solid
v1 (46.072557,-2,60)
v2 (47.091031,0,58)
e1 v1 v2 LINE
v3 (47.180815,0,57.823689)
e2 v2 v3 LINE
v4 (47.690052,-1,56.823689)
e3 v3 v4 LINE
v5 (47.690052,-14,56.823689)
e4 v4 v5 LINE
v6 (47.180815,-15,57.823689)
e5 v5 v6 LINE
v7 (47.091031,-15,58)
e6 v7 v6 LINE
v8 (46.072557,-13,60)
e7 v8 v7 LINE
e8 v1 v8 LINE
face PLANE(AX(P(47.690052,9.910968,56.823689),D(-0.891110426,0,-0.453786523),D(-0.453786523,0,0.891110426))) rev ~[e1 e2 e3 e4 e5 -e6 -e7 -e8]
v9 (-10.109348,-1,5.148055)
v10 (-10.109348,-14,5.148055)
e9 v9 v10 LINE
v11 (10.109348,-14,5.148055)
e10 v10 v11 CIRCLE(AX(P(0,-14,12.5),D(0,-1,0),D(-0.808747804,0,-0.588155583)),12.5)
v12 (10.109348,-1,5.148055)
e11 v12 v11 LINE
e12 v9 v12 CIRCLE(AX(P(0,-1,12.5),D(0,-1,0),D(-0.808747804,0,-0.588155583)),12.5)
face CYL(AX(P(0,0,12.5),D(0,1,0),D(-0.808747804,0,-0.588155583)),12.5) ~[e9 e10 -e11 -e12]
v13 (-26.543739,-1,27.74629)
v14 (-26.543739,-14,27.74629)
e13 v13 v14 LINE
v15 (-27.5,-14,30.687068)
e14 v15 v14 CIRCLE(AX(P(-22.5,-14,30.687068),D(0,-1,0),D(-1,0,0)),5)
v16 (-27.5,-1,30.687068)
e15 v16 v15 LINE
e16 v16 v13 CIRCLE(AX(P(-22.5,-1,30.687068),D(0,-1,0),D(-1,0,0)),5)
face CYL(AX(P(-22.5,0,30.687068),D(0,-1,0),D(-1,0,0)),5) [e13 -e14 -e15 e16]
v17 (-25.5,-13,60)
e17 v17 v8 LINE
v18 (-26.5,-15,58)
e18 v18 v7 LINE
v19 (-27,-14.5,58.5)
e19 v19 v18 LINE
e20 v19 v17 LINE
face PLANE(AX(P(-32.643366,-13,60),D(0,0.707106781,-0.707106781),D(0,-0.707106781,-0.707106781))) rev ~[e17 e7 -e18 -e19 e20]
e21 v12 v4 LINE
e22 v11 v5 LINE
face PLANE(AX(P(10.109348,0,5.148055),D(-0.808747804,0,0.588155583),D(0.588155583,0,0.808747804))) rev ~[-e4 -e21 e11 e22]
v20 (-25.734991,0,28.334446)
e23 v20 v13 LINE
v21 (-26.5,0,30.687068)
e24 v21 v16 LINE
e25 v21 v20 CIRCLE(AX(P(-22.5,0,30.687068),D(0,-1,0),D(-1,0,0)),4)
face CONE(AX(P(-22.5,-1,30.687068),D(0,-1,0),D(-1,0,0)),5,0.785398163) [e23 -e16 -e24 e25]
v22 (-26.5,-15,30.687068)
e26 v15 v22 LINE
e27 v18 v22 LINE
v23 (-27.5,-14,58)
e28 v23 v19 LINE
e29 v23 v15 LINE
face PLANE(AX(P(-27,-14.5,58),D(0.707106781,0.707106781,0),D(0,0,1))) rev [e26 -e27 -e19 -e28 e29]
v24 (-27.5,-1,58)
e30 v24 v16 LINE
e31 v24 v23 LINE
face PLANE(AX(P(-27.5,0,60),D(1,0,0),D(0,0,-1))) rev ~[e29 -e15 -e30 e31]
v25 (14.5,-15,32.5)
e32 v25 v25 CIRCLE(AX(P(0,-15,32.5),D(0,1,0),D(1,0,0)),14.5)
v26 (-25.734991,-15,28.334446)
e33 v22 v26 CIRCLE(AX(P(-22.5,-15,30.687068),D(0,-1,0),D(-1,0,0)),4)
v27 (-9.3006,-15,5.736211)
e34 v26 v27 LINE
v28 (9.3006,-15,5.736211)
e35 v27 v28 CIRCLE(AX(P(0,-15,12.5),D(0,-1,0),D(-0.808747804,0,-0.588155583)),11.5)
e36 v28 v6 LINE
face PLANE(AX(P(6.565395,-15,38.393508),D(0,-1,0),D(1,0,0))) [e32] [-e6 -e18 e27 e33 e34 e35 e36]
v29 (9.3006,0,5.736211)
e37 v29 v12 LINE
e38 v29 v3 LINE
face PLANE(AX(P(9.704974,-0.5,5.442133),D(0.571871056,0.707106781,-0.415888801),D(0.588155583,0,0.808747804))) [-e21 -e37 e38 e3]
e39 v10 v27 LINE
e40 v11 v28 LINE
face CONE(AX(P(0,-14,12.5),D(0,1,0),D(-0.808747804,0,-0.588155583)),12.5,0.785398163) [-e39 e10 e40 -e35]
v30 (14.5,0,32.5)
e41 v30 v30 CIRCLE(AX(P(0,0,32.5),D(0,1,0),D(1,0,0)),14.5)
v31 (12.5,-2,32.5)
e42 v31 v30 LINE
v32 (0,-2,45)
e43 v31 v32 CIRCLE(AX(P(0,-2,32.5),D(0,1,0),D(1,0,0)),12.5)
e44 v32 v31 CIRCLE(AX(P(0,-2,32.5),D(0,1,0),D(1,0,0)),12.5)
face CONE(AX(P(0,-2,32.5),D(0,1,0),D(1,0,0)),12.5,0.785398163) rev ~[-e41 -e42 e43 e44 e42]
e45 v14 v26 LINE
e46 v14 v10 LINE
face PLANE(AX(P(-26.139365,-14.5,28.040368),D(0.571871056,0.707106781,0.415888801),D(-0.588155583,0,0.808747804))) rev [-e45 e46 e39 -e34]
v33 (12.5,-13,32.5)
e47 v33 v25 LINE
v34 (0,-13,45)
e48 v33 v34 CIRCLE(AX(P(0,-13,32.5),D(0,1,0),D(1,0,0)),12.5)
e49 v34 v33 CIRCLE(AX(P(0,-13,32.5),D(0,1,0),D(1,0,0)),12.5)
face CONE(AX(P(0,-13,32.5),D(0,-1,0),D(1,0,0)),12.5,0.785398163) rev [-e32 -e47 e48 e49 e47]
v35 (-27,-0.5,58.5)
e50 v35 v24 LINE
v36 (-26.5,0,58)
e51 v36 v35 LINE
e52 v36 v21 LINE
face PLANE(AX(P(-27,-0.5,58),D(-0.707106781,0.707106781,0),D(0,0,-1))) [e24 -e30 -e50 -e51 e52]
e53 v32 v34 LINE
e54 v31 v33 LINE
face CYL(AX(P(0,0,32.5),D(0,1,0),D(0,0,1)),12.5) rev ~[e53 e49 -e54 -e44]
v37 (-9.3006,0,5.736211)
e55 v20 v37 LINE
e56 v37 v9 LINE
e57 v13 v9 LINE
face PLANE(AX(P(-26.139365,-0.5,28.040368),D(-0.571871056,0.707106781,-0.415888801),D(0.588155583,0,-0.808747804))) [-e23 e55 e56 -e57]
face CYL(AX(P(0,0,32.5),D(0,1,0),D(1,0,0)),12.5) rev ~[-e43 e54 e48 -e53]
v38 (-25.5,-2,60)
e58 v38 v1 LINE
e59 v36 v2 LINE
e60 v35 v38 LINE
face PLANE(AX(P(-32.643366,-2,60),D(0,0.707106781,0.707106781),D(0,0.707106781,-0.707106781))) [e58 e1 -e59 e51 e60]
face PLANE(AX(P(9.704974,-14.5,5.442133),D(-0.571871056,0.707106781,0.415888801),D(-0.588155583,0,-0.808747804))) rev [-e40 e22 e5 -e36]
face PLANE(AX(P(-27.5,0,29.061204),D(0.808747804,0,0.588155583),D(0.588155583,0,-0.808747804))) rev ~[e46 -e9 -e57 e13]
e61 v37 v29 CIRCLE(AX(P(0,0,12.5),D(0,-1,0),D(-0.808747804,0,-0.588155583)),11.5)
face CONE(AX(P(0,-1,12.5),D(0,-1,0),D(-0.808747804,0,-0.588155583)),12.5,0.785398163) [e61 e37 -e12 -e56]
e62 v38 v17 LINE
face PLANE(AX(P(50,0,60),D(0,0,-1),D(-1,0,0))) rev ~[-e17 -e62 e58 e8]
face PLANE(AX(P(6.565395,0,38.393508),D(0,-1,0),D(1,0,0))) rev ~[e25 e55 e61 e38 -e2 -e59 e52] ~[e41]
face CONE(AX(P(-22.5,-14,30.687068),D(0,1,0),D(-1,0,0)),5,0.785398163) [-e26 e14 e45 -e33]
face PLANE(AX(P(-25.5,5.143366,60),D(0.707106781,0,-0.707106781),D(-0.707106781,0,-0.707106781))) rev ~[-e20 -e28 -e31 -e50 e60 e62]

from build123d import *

# Parameters (mm, degrees)
F1_DEPTH    = 15
F2_T1_DEPTH = 34.8219363514
F2_T3_DEPTH = 25.2867319519
F2_T5_DEPTH = 87.7867319519
F3_R        = 5
F4_SIZE     = 1


# Not quite as in the source:
# - a fillet or chamfer that OpenCascade refuses, or shapes differently, is made with other operations: its cross-section is extruded or revolved along the edge and cut away or added


with BuildPart() as f1:
    # F0 (on Front) → F1 (new body)
    with BuildSketch(Plane.XZ):
        with BuildLine():
            Line((50, 60), (0, 60))
            Line((0, 60), (-27.5, 60))
            Line((-27.5, 60), (-27.5, 29.0612040202))
            Line((-27.5, 29.0612040202), (-10.1093475479, 5.1480552127))
            ThreePointArc((-10.1093475479, 5.1480552127), (0, 0), (10.1093475479, 5.1480552127))
            Line((10.1093475479, 5.1480552127), (50, 60))
        make_face()
        with BuildLine():
            ThreePointArc((12.5, 32.5), (-8.8388347648, 23.6611652352), (0, 45))
            ThreePointArc((0, 45), (8.8388347648, 41.3388347648), (12.5, 32.5))
        make_face(mode=Mode.SUBTRACT)
    extrude(amount=F1_DEPTH)

    # F2: chamfer of 2 on 7 edges, made by hand

    # F2_s2 → F2_t1 (cut)
    with BuildSketch(Plane.XZ.offset(-9.9109681757)):
        Polygon((47.69005228, 56.823688834), (46.0725566723, 60), (50, 60), align=None)
    extrude(amount=F2_T1_DEPTH, mode=Mode.SUBTRACT)

    # F2_s4 → F2_t3 (cut)
    with BuildSketch(Plane.XZ.offset(-5.1433659759)):
        Polygon((-25.5, 60), (-27.5, 58), (-27.5, 60), align=None)
    extrude(amount=F2_T3_DEPTH, mode=Mode.SUBTRACT)

    # F2_s6 → F2_t5 (cut)
    with BuildSketch(Plane.YZ.offset(-32.6433659759)):
        Polygon((-2, 60), (0, 58), (0, 60), align=None)
        Polygon((-13, 60), (-15, 58), (-15, 60), align=None)
    extrude(amount=F2_T5_DEPTH, mode=Mode.SUBTRACT)

    # F2_s7 → F2_t8 (revolve, cut)
    with BuildSketch(Plane.XY.offset(32.5)):
        Polygon((12.5, -2), (14.5, 0), (12.5, 0), align=None)
    revolve(axis=Axis((0, 0, 32.5), (0, 1, 0)), mode=Mode.SUBTRACT)

    # F2_s9 → F2_t10 (revolve, cut)
    with BuildSketch(Plane.XY.offset(32.5)):
        Polygon((12.5, -13), (14.5, -15), (12.5, -15), align=None)
    revolve(axis=Axis((0, -15, 32.5), (0, 1, 0)), mode=Mode.SUBTRACT)

    # F3
    f3_edges = [f1.edges().sort_by_distance(p)[0] for p in [
        (-27.5, -7.5, 29.061204),
    ]]
    fillet(f3_edges, radius=F3_R)

    # F4
    f4_edges = [f1.edges().sort_by_distance(p)[0] for p in [
        (28.8997, -15, 30.985872),
        (28.8997, 0, 30.985872),
        (-27.5, 0, 44.343534),
        (-27.254929, 0, 29.140895),
        (-18.326543, 0, 16.447173),
        (0, 0, 0),
        (-27.5, -15, 44.343534),
        (-27.254929, -15, 29.140895),
        (-18.326543, -15, 16.447173),
        (0, -15, 0),
    ]]
    chamfer(f4_edges, length=F4_SIZE)


solid = f1.part
